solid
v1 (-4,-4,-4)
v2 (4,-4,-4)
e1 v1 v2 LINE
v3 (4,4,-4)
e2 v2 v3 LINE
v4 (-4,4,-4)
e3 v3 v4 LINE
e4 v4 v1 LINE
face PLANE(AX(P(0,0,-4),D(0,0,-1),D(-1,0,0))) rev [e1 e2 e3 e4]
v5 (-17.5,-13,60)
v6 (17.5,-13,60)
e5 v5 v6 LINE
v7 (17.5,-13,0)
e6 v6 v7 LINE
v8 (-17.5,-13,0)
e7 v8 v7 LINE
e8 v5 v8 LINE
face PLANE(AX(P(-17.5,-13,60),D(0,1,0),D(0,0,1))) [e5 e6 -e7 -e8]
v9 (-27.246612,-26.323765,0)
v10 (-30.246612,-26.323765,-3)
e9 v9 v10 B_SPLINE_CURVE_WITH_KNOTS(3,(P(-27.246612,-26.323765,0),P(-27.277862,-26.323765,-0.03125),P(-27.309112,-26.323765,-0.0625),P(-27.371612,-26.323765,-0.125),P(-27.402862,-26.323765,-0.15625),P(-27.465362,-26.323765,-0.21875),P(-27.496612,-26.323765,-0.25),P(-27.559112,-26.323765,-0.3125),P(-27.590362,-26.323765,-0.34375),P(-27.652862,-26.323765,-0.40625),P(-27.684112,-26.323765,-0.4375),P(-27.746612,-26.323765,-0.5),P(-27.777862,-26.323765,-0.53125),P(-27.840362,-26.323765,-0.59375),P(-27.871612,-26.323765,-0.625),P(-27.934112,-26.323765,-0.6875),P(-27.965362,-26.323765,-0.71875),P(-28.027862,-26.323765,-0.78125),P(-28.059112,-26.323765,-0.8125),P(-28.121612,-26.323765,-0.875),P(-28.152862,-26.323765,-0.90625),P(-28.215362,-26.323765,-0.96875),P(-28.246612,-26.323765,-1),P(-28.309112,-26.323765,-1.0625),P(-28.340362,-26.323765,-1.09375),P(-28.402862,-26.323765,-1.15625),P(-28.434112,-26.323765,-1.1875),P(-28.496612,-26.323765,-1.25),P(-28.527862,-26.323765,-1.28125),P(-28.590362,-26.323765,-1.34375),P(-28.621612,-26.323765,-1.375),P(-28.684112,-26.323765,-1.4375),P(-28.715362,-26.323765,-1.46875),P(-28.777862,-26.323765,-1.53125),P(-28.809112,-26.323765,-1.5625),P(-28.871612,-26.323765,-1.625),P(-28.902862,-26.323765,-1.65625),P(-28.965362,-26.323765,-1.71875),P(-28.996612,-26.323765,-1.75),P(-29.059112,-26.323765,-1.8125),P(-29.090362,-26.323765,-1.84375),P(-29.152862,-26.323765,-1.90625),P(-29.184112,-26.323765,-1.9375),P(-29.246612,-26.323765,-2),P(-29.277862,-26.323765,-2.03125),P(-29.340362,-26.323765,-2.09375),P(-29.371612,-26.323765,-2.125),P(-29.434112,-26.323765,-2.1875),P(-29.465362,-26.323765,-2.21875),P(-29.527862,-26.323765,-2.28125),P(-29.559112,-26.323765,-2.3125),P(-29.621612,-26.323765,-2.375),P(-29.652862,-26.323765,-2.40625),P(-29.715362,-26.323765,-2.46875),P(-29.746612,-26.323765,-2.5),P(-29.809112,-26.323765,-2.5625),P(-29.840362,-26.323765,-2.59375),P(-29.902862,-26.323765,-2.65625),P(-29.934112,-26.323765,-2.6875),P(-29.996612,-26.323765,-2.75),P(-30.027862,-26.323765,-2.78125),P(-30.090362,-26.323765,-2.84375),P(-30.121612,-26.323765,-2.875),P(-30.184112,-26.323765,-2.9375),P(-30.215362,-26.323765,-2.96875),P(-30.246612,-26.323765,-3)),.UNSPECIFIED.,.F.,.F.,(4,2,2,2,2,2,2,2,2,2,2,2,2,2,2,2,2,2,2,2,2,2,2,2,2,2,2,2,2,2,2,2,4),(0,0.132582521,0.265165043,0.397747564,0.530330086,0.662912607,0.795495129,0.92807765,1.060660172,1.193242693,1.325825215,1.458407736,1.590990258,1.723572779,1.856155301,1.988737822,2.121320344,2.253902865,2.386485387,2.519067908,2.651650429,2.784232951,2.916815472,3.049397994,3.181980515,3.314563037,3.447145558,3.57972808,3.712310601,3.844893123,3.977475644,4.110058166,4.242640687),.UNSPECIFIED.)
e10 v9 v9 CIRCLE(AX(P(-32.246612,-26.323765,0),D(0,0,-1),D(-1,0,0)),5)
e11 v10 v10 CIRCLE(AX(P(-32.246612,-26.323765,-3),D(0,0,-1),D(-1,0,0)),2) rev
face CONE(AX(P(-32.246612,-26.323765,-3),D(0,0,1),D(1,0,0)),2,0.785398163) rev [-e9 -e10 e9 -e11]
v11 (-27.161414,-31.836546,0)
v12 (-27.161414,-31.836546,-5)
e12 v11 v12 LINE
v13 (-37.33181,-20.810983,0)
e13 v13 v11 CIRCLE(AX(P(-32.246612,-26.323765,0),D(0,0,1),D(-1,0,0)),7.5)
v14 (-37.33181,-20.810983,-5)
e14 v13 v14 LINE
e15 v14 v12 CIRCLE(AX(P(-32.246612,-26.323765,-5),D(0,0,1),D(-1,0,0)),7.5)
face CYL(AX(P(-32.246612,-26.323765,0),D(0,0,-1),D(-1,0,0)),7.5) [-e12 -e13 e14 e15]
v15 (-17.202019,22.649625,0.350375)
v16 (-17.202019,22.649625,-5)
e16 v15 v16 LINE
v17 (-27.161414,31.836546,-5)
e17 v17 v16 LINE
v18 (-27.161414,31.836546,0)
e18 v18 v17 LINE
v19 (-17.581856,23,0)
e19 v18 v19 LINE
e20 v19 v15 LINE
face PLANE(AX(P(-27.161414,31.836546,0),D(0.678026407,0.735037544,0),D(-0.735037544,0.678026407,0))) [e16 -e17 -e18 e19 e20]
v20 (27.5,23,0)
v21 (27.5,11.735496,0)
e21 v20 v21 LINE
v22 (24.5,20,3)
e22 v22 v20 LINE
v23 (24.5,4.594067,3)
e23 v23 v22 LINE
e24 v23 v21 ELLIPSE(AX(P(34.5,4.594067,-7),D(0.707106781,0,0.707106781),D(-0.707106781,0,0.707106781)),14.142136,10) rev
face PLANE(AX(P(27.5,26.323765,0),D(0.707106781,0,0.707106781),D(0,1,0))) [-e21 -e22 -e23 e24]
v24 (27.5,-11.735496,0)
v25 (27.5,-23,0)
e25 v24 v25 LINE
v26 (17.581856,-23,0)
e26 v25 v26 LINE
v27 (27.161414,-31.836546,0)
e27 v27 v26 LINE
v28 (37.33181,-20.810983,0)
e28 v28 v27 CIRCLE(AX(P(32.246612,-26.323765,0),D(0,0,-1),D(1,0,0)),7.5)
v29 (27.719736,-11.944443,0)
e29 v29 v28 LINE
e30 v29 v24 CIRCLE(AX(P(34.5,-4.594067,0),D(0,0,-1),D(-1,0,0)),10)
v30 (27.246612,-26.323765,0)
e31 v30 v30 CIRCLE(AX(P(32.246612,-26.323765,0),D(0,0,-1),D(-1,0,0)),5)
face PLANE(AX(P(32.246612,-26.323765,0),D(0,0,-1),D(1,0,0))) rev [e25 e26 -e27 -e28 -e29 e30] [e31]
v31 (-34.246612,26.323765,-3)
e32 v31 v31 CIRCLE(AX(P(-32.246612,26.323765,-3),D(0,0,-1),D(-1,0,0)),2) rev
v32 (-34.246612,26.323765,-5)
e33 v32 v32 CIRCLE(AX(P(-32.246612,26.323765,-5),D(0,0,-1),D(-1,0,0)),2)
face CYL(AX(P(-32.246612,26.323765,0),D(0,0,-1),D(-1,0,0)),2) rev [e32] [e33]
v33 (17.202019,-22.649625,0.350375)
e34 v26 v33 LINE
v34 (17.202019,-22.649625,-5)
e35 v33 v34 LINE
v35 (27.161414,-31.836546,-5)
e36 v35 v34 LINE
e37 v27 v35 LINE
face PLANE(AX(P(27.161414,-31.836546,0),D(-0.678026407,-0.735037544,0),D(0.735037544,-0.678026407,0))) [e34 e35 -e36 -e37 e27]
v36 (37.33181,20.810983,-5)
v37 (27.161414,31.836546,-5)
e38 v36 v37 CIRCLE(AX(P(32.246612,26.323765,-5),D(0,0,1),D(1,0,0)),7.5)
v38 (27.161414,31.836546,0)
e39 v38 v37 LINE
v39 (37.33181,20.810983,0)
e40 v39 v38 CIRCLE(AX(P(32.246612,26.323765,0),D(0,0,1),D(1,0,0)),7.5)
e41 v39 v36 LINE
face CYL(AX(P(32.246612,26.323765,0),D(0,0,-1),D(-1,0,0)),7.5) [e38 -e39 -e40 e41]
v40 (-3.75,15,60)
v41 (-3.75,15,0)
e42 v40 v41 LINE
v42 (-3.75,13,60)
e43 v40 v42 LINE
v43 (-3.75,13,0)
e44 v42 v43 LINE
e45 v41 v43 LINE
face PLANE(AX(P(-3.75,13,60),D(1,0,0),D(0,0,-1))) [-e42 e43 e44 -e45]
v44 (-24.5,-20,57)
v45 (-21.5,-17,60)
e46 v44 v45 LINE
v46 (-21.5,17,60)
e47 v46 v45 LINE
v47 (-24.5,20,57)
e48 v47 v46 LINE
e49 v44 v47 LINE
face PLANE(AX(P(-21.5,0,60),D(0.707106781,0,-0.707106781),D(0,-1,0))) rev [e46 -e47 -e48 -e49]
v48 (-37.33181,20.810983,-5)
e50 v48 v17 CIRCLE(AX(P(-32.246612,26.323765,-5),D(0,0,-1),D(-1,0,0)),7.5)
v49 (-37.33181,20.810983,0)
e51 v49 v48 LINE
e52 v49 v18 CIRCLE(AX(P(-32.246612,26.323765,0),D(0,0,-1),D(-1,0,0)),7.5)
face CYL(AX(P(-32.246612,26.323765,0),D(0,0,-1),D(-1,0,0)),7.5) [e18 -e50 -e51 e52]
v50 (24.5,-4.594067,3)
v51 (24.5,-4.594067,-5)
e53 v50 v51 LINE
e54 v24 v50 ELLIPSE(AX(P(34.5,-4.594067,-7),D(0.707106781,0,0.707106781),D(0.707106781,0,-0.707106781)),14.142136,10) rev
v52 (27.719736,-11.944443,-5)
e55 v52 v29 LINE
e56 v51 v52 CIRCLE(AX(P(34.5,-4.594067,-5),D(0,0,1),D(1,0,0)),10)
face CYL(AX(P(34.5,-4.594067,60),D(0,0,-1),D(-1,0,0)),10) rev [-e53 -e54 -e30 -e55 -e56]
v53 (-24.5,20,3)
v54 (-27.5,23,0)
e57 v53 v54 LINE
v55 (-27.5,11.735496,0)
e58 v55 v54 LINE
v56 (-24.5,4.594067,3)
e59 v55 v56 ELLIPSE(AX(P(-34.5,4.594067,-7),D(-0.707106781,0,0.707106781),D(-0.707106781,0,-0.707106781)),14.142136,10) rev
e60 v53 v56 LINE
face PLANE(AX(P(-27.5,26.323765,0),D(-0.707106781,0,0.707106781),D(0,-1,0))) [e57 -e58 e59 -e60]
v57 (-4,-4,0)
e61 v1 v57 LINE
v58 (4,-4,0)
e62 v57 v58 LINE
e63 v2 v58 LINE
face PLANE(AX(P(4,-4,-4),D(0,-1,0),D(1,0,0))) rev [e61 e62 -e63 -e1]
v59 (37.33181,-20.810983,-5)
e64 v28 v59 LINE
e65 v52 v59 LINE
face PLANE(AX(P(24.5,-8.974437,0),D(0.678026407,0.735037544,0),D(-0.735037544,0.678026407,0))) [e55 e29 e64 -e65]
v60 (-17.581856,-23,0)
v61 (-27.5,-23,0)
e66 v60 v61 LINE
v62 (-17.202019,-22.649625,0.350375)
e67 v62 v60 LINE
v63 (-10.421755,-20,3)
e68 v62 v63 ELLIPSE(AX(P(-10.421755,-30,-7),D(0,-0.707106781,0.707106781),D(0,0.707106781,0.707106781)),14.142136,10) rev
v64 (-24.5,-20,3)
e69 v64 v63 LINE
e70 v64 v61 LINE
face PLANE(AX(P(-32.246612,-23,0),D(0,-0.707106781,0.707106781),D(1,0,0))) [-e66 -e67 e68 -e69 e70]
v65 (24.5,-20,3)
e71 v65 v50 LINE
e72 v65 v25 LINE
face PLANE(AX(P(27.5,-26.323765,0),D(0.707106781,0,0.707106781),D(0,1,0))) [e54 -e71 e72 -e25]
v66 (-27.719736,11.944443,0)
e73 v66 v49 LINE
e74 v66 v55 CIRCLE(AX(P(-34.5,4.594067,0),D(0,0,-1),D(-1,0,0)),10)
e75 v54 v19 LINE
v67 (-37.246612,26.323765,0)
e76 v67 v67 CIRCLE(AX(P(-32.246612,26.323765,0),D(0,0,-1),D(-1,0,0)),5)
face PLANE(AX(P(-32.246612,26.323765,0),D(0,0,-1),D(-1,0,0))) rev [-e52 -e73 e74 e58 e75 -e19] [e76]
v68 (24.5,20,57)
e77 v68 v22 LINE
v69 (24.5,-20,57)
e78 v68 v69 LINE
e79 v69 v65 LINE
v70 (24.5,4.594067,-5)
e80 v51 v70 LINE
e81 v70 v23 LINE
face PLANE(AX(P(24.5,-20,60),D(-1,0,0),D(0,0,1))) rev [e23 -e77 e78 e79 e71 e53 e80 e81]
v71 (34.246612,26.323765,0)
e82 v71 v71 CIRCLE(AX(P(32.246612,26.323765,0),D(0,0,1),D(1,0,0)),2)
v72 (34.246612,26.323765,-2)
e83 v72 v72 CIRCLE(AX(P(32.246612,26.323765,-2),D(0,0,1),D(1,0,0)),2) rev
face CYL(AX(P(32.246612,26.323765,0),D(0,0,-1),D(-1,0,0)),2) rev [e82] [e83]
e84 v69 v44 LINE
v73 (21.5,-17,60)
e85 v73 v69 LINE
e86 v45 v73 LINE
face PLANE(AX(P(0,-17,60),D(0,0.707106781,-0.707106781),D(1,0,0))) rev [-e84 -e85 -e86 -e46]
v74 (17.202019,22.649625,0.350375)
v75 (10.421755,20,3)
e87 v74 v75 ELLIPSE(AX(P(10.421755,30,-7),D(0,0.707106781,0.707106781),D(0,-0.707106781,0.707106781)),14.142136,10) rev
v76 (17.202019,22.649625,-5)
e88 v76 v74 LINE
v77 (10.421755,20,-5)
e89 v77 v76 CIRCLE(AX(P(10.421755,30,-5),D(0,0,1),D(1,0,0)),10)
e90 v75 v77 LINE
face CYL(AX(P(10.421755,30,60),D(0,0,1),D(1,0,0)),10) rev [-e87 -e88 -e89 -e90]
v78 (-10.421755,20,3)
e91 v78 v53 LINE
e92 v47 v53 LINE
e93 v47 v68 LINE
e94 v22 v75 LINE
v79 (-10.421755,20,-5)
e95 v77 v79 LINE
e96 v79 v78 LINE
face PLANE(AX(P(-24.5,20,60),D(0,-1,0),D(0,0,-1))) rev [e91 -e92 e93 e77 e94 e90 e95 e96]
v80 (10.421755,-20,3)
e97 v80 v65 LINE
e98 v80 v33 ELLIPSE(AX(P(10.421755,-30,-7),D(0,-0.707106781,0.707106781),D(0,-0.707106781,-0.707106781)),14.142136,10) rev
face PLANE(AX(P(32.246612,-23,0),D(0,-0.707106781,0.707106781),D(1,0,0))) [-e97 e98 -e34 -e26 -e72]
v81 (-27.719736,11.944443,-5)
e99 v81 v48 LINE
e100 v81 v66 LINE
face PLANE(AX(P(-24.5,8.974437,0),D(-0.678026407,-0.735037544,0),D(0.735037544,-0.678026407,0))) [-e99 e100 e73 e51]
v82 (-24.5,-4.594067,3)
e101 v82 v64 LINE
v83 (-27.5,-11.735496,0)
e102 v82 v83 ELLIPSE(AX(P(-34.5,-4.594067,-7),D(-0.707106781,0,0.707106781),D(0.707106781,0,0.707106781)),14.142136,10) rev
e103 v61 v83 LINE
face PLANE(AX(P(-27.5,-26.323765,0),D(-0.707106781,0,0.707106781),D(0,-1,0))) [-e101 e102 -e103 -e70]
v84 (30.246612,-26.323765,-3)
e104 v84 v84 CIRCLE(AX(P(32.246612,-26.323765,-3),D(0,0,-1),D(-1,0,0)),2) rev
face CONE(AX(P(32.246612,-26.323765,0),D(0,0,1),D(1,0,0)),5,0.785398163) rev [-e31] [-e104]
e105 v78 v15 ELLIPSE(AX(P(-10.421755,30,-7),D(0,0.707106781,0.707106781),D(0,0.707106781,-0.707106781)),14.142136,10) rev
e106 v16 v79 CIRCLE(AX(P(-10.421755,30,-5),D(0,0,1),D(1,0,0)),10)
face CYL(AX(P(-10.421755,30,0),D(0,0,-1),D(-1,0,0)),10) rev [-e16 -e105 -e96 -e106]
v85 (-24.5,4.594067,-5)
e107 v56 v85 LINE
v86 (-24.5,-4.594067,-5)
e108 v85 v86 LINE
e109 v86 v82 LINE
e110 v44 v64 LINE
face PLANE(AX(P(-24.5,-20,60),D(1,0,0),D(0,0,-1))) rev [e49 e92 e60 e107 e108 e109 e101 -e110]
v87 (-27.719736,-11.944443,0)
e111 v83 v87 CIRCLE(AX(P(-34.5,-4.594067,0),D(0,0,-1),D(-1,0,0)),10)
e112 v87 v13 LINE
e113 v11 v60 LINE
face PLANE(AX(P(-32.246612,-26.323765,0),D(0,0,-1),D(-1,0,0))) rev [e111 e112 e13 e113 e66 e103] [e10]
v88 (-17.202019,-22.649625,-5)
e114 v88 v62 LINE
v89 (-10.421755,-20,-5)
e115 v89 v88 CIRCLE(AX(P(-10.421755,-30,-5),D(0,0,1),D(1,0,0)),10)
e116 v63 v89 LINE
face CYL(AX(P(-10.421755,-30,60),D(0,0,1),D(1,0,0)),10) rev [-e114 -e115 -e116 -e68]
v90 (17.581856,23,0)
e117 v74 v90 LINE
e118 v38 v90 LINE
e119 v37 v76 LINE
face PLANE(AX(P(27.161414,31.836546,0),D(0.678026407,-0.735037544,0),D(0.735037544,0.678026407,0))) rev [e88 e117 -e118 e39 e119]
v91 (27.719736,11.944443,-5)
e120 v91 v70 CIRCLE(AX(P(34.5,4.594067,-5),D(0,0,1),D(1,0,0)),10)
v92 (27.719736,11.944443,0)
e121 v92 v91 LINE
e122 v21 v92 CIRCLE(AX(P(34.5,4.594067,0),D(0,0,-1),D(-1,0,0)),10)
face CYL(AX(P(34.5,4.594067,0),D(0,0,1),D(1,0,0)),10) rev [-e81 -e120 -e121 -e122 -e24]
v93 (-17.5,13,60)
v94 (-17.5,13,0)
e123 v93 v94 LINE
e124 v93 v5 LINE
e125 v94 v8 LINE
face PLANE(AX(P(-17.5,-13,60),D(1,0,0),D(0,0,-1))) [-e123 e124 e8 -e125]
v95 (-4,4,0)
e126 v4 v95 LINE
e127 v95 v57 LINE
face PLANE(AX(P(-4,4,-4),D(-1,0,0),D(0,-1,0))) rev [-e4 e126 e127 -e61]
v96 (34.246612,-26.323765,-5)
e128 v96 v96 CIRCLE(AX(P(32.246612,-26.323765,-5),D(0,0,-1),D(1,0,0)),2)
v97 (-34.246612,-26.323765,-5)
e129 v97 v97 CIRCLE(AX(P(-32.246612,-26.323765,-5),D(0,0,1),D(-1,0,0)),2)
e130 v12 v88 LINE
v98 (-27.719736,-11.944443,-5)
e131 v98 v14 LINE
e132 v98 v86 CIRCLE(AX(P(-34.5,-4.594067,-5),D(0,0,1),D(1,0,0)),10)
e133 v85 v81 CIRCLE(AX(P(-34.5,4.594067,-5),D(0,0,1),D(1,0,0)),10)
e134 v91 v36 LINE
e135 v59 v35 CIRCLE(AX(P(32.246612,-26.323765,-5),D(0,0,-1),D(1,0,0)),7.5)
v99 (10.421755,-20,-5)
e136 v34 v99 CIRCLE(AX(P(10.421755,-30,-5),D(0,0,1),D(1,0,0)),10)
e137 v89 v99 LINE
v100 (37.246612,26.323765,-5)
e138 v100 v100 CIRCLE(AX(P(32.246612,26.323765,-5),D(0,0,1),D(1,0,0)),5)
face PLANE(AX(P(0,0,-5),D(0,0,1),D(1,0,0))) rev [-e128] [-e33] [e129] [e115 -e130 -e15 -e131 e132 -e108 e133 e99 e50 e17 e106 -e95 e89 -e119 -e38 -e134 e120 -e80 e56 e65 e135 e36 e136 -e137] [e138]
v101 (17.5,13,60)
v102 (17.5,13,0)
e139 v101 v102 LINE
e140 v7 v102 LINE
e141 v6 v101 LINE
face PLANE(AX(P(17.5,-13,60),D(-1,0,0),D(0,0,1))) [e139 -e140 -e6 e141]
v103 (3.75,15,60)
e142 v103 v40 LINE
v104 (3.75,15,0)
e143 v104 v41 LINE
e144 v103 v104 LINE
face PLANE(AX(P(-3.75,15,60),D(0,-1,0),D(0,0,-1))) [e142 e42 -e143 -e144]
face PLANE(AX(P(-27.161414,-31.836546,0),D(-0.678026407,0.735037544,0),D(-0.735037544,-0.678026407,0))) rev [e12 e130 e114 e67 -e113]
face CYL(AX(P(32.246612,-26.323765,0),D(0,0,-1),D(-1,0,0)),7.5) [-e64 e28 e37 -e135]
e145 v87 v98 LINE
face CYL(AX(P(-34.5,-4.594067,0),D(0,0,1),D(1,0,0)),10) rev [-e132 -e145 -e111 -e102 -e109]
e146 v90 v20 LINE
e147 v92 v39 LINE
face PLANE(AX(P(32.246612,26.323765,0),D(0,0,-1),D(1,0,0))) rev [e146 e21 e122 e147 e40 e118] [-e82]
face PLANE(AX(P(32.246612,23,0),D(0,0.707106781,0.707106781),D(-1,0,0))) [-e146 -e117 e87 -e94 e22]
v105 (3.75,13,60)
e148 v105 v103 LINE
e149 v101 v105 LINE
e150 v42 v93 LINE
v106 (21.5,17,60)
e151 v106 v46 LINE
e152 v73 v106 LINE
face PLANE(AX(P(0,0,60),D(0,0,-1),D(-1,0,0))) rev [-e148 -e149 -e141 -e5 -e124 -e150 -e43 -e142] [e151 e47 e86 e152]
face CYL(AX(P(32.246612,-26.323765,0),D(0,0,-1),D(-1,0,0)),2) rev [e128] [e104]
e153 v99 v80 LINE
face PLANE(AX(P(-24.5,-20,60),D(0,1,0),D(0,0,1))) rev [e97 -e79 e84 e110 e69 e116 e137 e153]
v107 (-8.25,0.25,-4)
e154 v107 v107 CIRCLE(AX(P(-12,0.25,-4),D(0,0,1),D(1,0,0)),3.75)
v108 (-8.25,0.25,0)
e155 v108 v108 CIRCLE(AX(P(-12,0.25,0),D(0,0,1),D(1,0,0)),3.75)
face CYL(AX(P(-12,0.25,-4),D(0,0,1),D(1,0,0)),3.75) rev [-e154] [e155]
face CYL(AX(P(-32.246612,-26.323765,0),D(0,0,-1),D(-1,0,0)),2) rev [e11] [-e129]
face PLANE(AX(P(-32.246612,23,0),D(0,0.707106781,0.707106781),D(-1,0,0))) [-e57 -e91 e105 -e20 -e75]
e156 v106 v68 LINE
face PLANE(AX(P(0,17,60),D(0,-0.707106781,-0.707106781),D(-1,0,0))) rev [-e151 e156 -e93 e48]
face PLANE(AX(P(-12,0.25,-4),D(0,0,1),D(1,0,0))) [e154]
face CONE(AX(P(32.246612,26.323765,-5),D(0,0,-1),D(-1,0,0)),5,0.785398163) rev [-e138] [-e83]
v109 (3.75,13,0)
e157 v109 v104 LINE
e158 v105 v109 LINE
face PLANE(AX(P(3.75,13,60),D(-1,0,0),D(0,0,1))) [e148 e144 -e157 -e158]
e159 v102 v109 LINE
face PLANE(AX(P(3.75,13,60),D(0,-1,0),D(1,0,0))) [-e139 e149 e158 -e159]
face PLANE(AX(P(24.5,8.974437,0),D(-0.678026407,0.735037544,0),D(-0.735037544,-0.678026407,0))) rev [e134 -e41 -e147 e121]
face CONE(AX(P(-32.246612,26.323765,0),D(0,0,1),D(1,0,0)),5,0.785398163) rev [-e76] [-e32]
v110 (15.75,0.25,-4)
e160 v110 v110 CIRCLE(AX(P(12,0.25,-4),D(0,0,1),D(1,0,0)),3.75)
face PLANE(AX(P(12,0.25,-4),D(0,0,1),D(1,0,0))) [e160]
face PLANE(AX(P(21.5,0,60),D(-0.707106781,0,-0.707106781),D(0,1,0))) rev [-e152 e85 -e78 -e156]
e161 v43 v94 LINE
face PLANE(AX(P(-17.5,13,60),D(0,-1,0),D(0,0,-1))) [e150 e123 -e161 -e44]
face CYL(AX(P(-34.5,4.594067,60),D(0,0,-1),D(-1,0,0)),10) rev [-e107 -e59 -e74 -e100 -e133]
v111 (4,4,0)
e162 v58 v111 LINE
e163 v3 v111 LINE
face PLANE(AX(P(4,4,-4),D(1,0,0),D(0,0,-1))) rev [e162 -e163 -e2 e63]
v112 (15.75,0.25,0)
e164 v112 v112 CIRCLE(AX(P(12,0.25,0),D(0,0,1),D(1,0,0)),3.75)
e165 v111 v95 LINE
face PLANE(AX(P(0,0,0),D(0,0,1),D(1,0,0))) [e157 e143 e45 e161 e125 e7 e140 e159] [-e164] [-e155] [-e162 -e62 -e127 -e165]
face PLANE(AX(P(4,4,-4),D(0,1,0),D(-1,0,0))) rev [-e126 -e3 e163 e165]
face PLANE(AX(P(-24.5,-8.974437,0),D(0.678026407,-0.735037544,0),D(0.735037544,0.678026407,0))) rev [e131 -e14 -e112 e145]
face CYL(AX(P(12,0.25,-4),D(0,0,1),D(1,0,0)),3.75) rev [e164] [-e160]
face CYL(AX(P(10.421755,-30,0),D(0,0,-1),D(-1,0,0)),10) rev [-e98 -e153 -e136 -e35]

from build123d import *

# Parameters (mm, degrees)
SKETCH1_W               = 49
SKETCH1_H               = 40
BOSS_EXTRUDE1_DEPTH     = 60
SKETCH2_W               = 49
SKETCH2_H               = 40
BOSS_EXTRUDE2_DEPTH     = 5
SKETCH3_R               = 3.75
SKETCH3_W               = 8
SKETCH3_H               = 8
CUT_EXTRUDE1_DEPTH      = 4
SKETCH4_R               = 2
BOSS_EXTRUDE3_DEPTH     = 5
MIRROR2_COPY_1_SKETCH_R = 2
MIRROR2_COPY_1_DEPTH    = 5
CHAMFER2_SIZE           = 3
FILLET1_R               = 10
CHAMFER3_SIZE           = 3


with BuildPart() as part:
    # Sketch1 → Boss-Extrude1 (new body)
    with BuildSketch(Plane.XY):
        Rectangle(SKETCH1_W, SKETCH1_H)
        Polygon((-17.5, -13), (17.5, -13), (17.5, 13), (3.75, 13), (3.75, 15), (-3.75, 15), (-3.75, 13), (-17.5, 13), align=None, mode=Mode.SUBTRACT)
    extrude(amount=BOSS_EXTRUDE1_DEPTH)

    # Sketch2 → Boss-Extrude2 (add)
    with BuildSketch(Plane.XY):
        Rectangle(SKETCH2_W, SKETCH2_H)
    extrude(amount=-BOSS_EXTRUDE2_DEPTH)

    # Sketch3 → Cut-Extrude1 (cut)
    with BuildSketch(Plane.XY):
        with Locations((12, 0.25)):
            Circle(SKETCH3_R)
        with Locations((-12, 0.25)):
            Circle(SKETCH3_R)
        Rectangle(SKETCH3_W, SKETCH3_H)
    extrude(amount=-CUT_EXTRUDE1_DEPTH, mode=Mode.SUBTRACT)

    # Sketch4 → Boss-Extrude3 (add)
    with BuildSketch(Plane(origin=(0, 0, -5), x_dir=(-1, 0, 0), z_dir=(0, 0, -1))):
        with BuildLine():
            Line((27.161413951, 31.836546483), (14.329603899, 20))
            Line((14.329603899, 20), (24.5, 8.974436833))
            Line((24.5, 8.974436833), (37.331810052, 20.810983316))
            ThreePointArc((37.331810052, 20.810983316), (37.759393585, 31.40896295), (27.161413951, 31.836546483))
        make_face()
        with Locations((32.246612001, 26.323764899)):
            Circle(SKETCH4_R, mode=Mode.SUBTRACT)
    boss_extrude3 = extrude(amount=-BOSS_EXTRUDE3_DEPTH)

    # Mirror1: Boss-Extrude3 across plane
    add(boss_extrude3.mirror(Plane.ZX))

    # Mirror2: Boss-Extrude3 across plane
    add(boss_extrude3.mirror(Plane(origin=(0, 0, 0), x_dir=(0, 0, 1), z_dir=(1, 0, 0))))

    # Mirror2 copy 1 sketch → Mirror2 copy 1 (add)
    with BuildSketch(Plane(origin=(0, 0, -5), x_dir=(1, 0, 0), z_dir=(0, 0, -1))):
        with BuildLine():
            Line((27.161413951, 31.836546483), (14.329603899, 20))
            Line((14.329603899, 20), (24.5, 8.974436833))
            Line((24.5, 8.974436833), (37.331810052, 20.810983316))
            ThreePointArc((37.331810052, 20.810983316), (37.759393585, 31.40896295), (27.161413951, 31.836546483))
        make_face()
        with Locations((32.246612001, 26.323764899)):
            Circle(MIRROR2_COPY_1_SKETCH_R, mode=Mode.SUBTRACT)
    extrude(amount=-MIRROR2_COPY_1_DEPTH)

    # Chamfer2
    chamfer2_edges = [part.edges().sort_by_distance(p)[0] for p in [
        (-30.246612001, -26.323764899, 0),
        (24.5, -14.487218417, 0),
        (30.246612001, -26.323764899, 0),
        (19.414801949, -20, 0),
        (19.414801949, 20, 0),
        (24.5, 14.487218417, 0),
        (30.246612001, 26.323764899, -5),
        (-19.414801949, 20, 0),
        (-30.246612001, 26.323764899, 0),
        (-24.5, 14.487218417, 0),
        (-19.414801949, -20, 0),
        (-24.5, -14.487218417, 0),
    ]]
    chamfer(chamfer2_edges, length=CHAMFER2_SIZE)

    # Fillet1
    # the kernel refuses this fillet: 10 mm, written as the material it adds along each edge
    with BuildSketch(Plane(origin=(-14.329603899, -20, 12.769621541), x_dir=(1, 0, 0), z_dir=(0, 0, -1))) as fillet1_piece_1_section:
        with BuildLine():
            CenterArc((FILLET1_R * 0.390784861631, FILLET1_R), FILLET1_R, 227.310388658, 42.689611342)
            Line((-FILLET1_R * 0.287241545106, FILLET1_R * 0.264962455539), (0, 0))
            Line((0, 0), (FILLET1_R * 0.390784861631, 0))
        make_face()
    fillet1_piece_1 = extrude(amount=17.769621541, mode=Mode.PRIVATE)
    fillet1_piece_1 = split(fillet1_piece_1, bisect_by=Plane(origin=(-13.989510019, -22.368902141, 0.631097859), z_dir=(0, 0.7071067811865476, -0.7071067811865476)), keep=Keep.TOP, mode=Mode.PRIVATE)
    add(fillet1_piece_1)
    with BuildSketch(Plane(origin=(14.329603899, -20, -5), x_dir=(-1, 0, 0), z_dir=(0, 0, 1))) as fillet1_piece_2_section:
        with BuildLine():
            CenterArc((FILLET1_R * 0.390784861631, FILLET1_R), FILLET1_R, 227.310388658, 42.689611342)
            Line((-FILLET1_R * 0.287241545106, FILLET1_R * 0.264962455539), (0, 0))
            Line((0, 0), (FILLET1_R * 0.390784861631, 0))
        make_face()
    fillet1_piece_2 = extrude(amount=17.769621541, mode=Mode.PRIVATE)
    fillet1_piece_2 = split(fillet1_piece_2, bisect_by=Plane(origin=(13.989510019, -22.368902141, 0.631097859), z_dir=(0, 0.7071067811865476, -0.7071067811865476)), keep=Keep.TOP, mode=Mode.PRIVATE)
    add(fillet1_piece_2)
    with BuildSketch(Plane(origin=(-24.5, 8.974436833, 13.950923381), x_dir=(-0.7350375444611025, 0.6780264067369298, 0), z_dir=(0, 0, -1))) as fillet1_piece_3_section:
        with BuildLine():
            CenterArc((FILLET1_R * 0.438036935241, -FILLET1_R), FILLET1_R, 90, 47.310388658)
            Line((-FILLET1_R * 0.29700060922, -FILLET1_R * 0.321973593263), (0, 0))
            Line((0, 0), (FILLET1_R * 0.438036935241, 0))
        make_face()
    fillet1_piece_3 = extrude(amount=18.950923381, mode=Mode.PRIVATE)
    fillet1_piece_3 = split(fillet1_piece_3, bisect_by=Plane(origin=(-24.902442497, 8.18834841, 0), z_dir=(0, 0, 1)), keep=Keep.TOP, mode=Mode.PRIVATE)
    fillet1_piece_3 = split(fillet1_piece_3, bisect_by=Plane(origin=(-25.551831873, 8.18834841, 1.948168127), z_dir=(0.7071067811865476, 0, -0.7071067811865476)), keep=Keep.TOP, mode=Mode.PRIVATE)
    add(fillet1_piece_3)
    with BuildSketch(Plane(origin=(-24.5, 8.974436833, 13.950923381), x_dir=(-0.7350375444611025, 0.6780264067369298, 0), z_dir=(0, 0, -1))) as fillet1_piece_4_section:
        with BuildLine():
            CenterArc((FILLET1_R * 0.438036935241, -FILLET1_R), FILLET1_R, 90, 47.310388658)
            Line((-FILLET1_R * 0.29700060922, -FILLET1_R * 0.321973593263), (0, 0))
            Line((0, 0), (FILLET1_R * 0.438036935241, 0))
        make_face()
    fillet1_piece_4 = extrude(amount=18.950923381, mode=Mode.PRIVATE)
    fillet1_piece_4 = split(fillet1_piece_4, bisect_by=Plane(origin=(-27.613706102, 11.943996137, 0), z_dir=(0, 0, -1)), keep=Keep.TOP, mode=Mode.PRIVATE)
    fillet1_piece_4 = split(fillet1_piece_4, bisect_by=Plane(origin=(-27.585279578, 11.943996137, -0.085279578), z_dir=(-0.7071067811865476, 0, 0.7071067811865476)), keep=Keep.TOP, mode=Mode.PRIVATE)
    add(fillet1_piece_4)
    with BuildSketch(Plane(origin=(-24.5, 8.974436833, 13.950923381), x_dir=(-0.7350375444611025, 0.6780264067369298, 0), z_dir=(0, 0, -1))) as fillet1_piece_5_section:
        with BuildLine():
            CenterArc((FILLET1_R * 0.438036935241, -FILLET1_R), FILLET1_R, 90, 47.310388658)
            Line((-FILLET1_R * 0.29700060922, -FILLET1_R * 0.321973593263), (0, 0))
            Line((0, 0), (FILLET1_R * 0.438036935241, 0))
        make_face()
    fillet1_piece_5 = extrude(amount=18.950923381, mode=Mode.PRIVATE)
    fillet1_piece_5 = split(fillet1_piece_5, bisect_by=Plane(origin=(-25.183285412, 8.674450436, 0), z_dir=(0, 0, -1)), keep=Keep.TOP, mode=Mode.PRIVATE)
    fillet1_piece_5 = split(fillet1_piece_5, bisect_by=Plane(origin=(-27.591834999, 8.674450436, -0.091834999), z_dir=(0.7071067811865476, 0, -0.7071067811865476)), keep=Keep.TOP, mode=Mode.PRIVATE)
    add(fillet1_piece_5)
    with BuildSketch(Plane(origin=(-24.5, -8.974436833, -5), x_dir=(-0.7350375444611025, -0.6780264067369298, 0), z_dir=(0, 0, 1))) as fillet1_piece_6_section:
        with BuildLine():
            CenterArc((FILLET1_R * 0.438036935241, -FILLET1_R), FILLET1_R, 90, 47.310388658)
            Line((-FILLET1_R * 0.29700060922, -FILLET1_R * 0.321973593263), (0, 0))
            Line((0, 0), (FILLET1_R * 0.438036935241, 0))
        make_face()
    fillet1_piece_6 = extrude(amount=18.950923381, mode=Mode.PRIVATE)
    fillet1_piece_6 = split(fillet1_piece_6, bisect_by=Plane(origin=(-25.183285412, -8.674450436, 0), z_dir=(0, 0, -1)), keep=Keep.TOP, mode=Mode.PRIVATE)
    fillet1_piece_6 = split(fillet1_piece_6, bisect_by=Plane(origin=(-27.591834999, -8.674450436, -0.091834999), z_dir=(0.7071067811865476, 0, -0.7071067811865476)), keep=Keep.TOP, mode=Mode.PRIVATE)
    add(fillet1_piece_6)
    with BuildSketch(Plane(origin=(-24.5, -8.974436833, -5), x_dir=(-0.7350375444611025, -0.6780264067369298, 0), z_dir=(0, 0, 1))) as fillet1_piece_7_section:
        with BuildLine():
            CenterArc((FILLET1_R * 0.438036935241, -FILLET1_R), FILLET1_R, 90, 47.310388658)
            Line((-FILLET1_R * 0.29700060922, -FILLET1_R * 0.321973593263), (0, 0))
            Line((0, 0), (FILLET1_R * 0.438036935241, 0))
        make_face()
    fillet1_piece_7 = extrude(amount=18.950923381, mode=Mode.PRIVATE)
    fillet1_piece_7 = split(fillet1_piece_7, bisect_by=Plane(origin=(-24.902442497, -8.18834841, 0), z_dir=(0, 0, 1)), keep=Keep.TOP, mode=Mode.PRIVATE)
    fillet1_piece_7 = split(fillet1_piece_7, bisect_by=Plane(origin=(-25.551831873, -8.18834841, 1.948168127), z_dir=(0.7071067811865476, 0, -0.7071067811865476)), keep=Keep.TOP, mode=Mode.PRIVATE)
    add(fillet1_piece_7)
    with BuildSketch(Plane(origin=(-24.5, -8.974436833, -5), x_dir=(-0.7350375444611025, -0.6780264067369298, 0), z_dir=(0, 0, 1))) as fillet1_piece_8_section:
        with BuildLine():
            CenterArc((FILLET1_R * 0.438036935241, -FILLET1_R), FILLET1_R, 90, 47.310388658)
            Line((-FILLET1_R * 0.29700060922, -FILLET1_R * 0.321973593263), (0, 0))
            Line((0, 0), (FILLET1_R * 0.438036935241, 0))
        make_face()
    fillet1_piece_8 = extrude(amount=18.950923381, mode=Mode.PRIVATE)
    fillet1_piece_8 = split(fillet1_piece_8, bisect_by=Plane(origin=(-27.613706102, -11.943996137, 0), z_dir=(0, 0, -1)), keep=Keep.TOP, mode=Mode.PRIVATE)
    fillet1_piece_8 = split(fillet1_piece_8, bisect_by=Plane(origin=(-27.585279578, -11.943996137, -0.085279578), z_dir=(-0.7071067811865476, 0, 0.7071067811865476)), keep=Keep.TOP, mode=Mode.PRIVATE)
    add(fillet1_piece_8)
    with BuildSketch(Plane(origin=(-14.329603899, 20, -5), x_dir=(1, 0, 0), z_dir=(0, 0, 1))) as fillet1_piece_9_section:
        with BuildLine():
            CenterArc((FILLET1_R * 0.390784861631, FILLET1_R), FILLET1_R, 227.310388658, 42.689611342)
            Line((-FILLET1_R * 0.287241545106, FILLET1_R * 0.264962455539), (0, 0))
            Line((0, 0), (FILLET1_R * 0.390784861631, 0))
        make_face()
    fillet1_piece_9 = extrude(amount=17.769621541, mode=Mode.PRIVATE)
    fillet1_piece_9 = split(fillet1_piece_9, bisect_by=Plane(origin=(-13.989510019, 22.368902141, 0.631097859), z_dir=(0, -0.7071067811865476, -0.7071067811865476)), keep=Keep.TOP, mode=Mode.PRIVATE)
    add(fillet1_piece_9)
    with BuildSketch(Plane(origin=(14.329603899, 20, 12.769621541), x_dir=(0.7350375444611016, 0.6780264067369309, 0), z_dir=(0, 0, -1))) as fillet1_piece_10_section:
        with BuildLine():
            CenterArc((FILLET1_R * 0.390784861631, -FILLET1_R), FILLET1_R, 90, 42.689611342)
            Line((-FILLET1_R * 0.287241545106, -FILLET1_R * 0.264962455539), (0, 0))
            Line((0, 0), (FILLET1_R * 0.390784861631, 0))
        make_face()
    fillet1_piece_10 = extrude(amount=17.769621541, mode=Mode.PRIVATE)
    fillet1_piece_10 = split(fillet1_piece_10, bisect_by=Plane(origin=(13.989510019, 22.368902141, 0.631097859), z_dir=(0, -0.7071067811865476, -0.7071067811865476)), keep=Keep.TOP, mode=Mode.PRIVATE)
    add(fillet1_piece_10)
    with BuildSketch(Plane(origin=(24.5, 8.974436833, -5), x_dir=(0.7350375444611025, 0.6780264067369298, 0), z_dir=(0, 0, 1))) as fillet1_piece_11_section:
        with BuildLine():
            CenterArc((FILLET1_R * 0.438036935241, -FILLET1_R), FILLET1_R, 90, 47.310388658)
            Line((-FILLET1_R * 0.29700060922, -FILLET1_R * 0.321973593263), (0, 0))
            Line((0, 0), (FILLET1_R * 0.438036935241, 0))
        make_face()
    fillet1_piece_11 = extrude(amount=18.950923381, mode=Mode.PRIVATE)
    fillet1_piece_11 = split(fillet1_piece_11, bisect_by=Plane(origin=(25.183285412, 8.674450436, 0), z_dir=(0, 0, -1)), keep=Keep.TOP, mode=Mode.PRIVATE)
    fillet1_piece_11 = split(fillet1_piece_11, bisect_by=Plane(origin=(27.591834999, 8.674450436, -0.091834999), z_dir=(-0.7071067811865476, 0, -0.7071067811865476)), keep=Keep.TOP, mode=Mode.PRIVATE)
    add(fillet1_piece_11)
    with BuildSketch(Plane(origin=(24.5, 8.974436833, -5), x_dir=(0.7350375444611025, 0.6780264067369298, 0), z_dir=(0, 0, 1))) as fillet1_piece_12_section:
        with BuildLine():
            CenterArc((FILLET1_R * 0.438036935241, -FILLET1_R), FILLET1_R, 90, 47.310388658)
            Line((-FILLET1_R * 0.29700060922, -FILLET1_R * 0.321973593263), (0, 0))
            Line((0, 0), (FILLET1_R * 0.438036935241, 0))
        make_face()
    fillet1_piece_12 = extrude(amount=18.950923381, mode=Mode.PRIVATE)
    fillet1_piece_12 = split(fillet1_piece_12, bisect_by=Plane(origin=(24.902442497, 8.18834841, 0), z_dir=(0, 0, 1)), keep=Keep.TOP, mode=Mode.PRIVATE)
    fillet1_piece_12 = split(fillet1_piece_12, bisect_by=Plane(origin=(25.551831873, 8.18834841, 1.948168127), z_dir=(-0.7071067811865476, 0, -0.7071067811865476)), keep=Keep.TOP, mode=Mode.PRIVATE)
    add(fillet1_piece_12)
    with BuildSketch(Plane(origin=(24.5, 8.974436833, -5), x_dir=(0.7350375444611025, 0.6780264067369298, 0), z_dir=(0, 0, 1))) as fillet1_piece_13_section:
        with BuildLine():
            CenterArc((FILLET1_R * 0.438036935241, -FILLET1_R), FILLET1_R, 90, 47.310388658)
            Line((-FILLET1_R * 0.29700060922, -FILLET1_R * 0.321973593263), (0, 0))
            Line((0, 0), (FILLET1_R * 0.438036935241, 0))
        make_face()
    fillet1_piece_13 = extrude(amount=18.950923381, mode=Mode.PRIVATE)
    fillet1_piece_13 = split(fillet1_piece_13, bisect_by=Plane(origin=(27.613706102, 11.943996137, 0), z_dir=(0, 0, -1)), keep=Keep.TOP, mode=Mode.PRIVATE)
    fillet1_piece_13 = split(fillet1_piece_13, bisect_by=Plane(origin=(27.585279578, 11.943996137, -0.085279578), z_dir=(0.7071067811865476, 0, 0.7071067811865476)), keep=Keep.TOP, mode=Mode.PRIVATE)
    add(fillet1_piece_13)
    with BuildSketch(Plane(origin=(24.5, -8.974436833, 13.950923381), x_dir=(0.7350375444611025, -0.6780264067369298, 0), z_dir=(0, 0, -1))) as fillet1_piece_14_section:
        with BuildLine():
            CenterArc((FILLET1_R * 0.438036935241, -FILLET1_R), FILLET1_R, 90, 47.310388658)
            Line((-FILLET1_R * 0.29700060922, -FILLET1_R * 0.321973593263), (0, 0))
            Line((0, 0), (FILLET1_R * 0.438036935241, 0))
        make_face()
    fillet1_piece_14 = extrude(amount=18.950923381, mode=Mode.PRIVATE)
    fillet1_piece_14 = split(fillet1_piece_14, bisect_by=Plane(origin=(24.902442497, -8.18834841, 0), z_dir=(0, 0, 1)), keep=Keep.TOP, mode=Mode.PRIVATE)
    fillet1_piece_14 = split(fillet1_piece_14, bisect_by=Plane(origin=(25.551831873, -8.18834841, 1.948168127), z_dir=(-0.7071067811865476, 0, -0.7071067811865476)), keep=Keep.TOP, mode=Mode.PRIVATE)
    add(fillet1_piece_14)
    with BuildSketch(Plane(origin=(24.5, -8.974436833, 13.950923381), x_dir=(0.7350375444611025, -0.6780264067369298, 0), z_dir=(0, 0, -1))) as fillet1_piece_15_section:
        with BuildLine():
            CenterArc((FILLET1_R * 0.438036935241, -FILLET1_R), FILLET1_R, 90, 47.310388658)
            Line((-FILLET1_R * 0.29700060922, -FILLET1_R * 0.321973593263), (0, 0))
            Line((0, 0), (FILLET1_R * 0.438036935241, 0))
        make_face()
    fillet1_piece_15 = extrude(amount=18.950923381, mode=Mode.PRIVATE)
    fillet1_piece_15 = split(fillet1_piece_15, bisect_by=Plane(origin=(27.613706102, -11.943996137, 0), z_dir=(0, 0, -1)), keep=Keep.TOP, mode=Mode.PRIVATE)
    fillet1_piece_15 = split(fillet1_piece_15, bisect_by=Plane(origin=(27.585279578, -11.943996137, -0.085279578), z_dir=(0.7071067811865476, 0, 0.7071067811865476)), keep=Keep.TOP, mode=Mode.PRIVATE)
    add(fillet1_piece_15)
    with BuildSketch(Plane(origin=(24.5, -8.974436833, 13.950923381), x_dir=(0.7350375444611025, -0.6780264067369298, 0), z_dir=(0, 0, -1))) as fillet1_piece_16_section:
        with BuildLine():
            CenterArc((FILLET1_R * 0.438036935241, -FILLET1_R), FILLET1_R, 90, 47.310388658)
            Line((-FILLET1_R * 0.29700060922, -FILLET1_R * 0.321973593263), (0, 0))
            Line((0, 0), (FILLET1_R * 0.438036935241, 0))
        make_face()
    fillet1_piece_16 = extrude(amount=18.950923381, mode=Mode.PRIVATE)
    fillet1_piece_16 = split(fillet1_piece_16, bisect_by=Plane(origin=(25.183285412, -8.674450436, 0), z_dir=(0, 0, -1)), keep=Keep.TOP, mode=Mode.PRIVATE)
    fillet1_piece_16 = split(fillet1_piece_16, bisect_by=Plane(origin=(27.591834999, -8.674450436, -0.091834999), z_dir=(-0.7071067811865476, 0, -0.7071067811865476)), keep=Keep.TOP, mode=Mode.PRIVATE)
    add(fillet1_piece_16)

    # Chamfer3
    chamfer3_edges = [part.edges().sort_by_distance(p)[0] for p in [
        (24.5, 0, 60),
        (0, 20, 60),
        (-24.5, 0, 60),
        (0, -20, 60),
    ]]
    chamfer(chamfer3_edges, length=CHAMFER3_SIZE)


solid = part.part
